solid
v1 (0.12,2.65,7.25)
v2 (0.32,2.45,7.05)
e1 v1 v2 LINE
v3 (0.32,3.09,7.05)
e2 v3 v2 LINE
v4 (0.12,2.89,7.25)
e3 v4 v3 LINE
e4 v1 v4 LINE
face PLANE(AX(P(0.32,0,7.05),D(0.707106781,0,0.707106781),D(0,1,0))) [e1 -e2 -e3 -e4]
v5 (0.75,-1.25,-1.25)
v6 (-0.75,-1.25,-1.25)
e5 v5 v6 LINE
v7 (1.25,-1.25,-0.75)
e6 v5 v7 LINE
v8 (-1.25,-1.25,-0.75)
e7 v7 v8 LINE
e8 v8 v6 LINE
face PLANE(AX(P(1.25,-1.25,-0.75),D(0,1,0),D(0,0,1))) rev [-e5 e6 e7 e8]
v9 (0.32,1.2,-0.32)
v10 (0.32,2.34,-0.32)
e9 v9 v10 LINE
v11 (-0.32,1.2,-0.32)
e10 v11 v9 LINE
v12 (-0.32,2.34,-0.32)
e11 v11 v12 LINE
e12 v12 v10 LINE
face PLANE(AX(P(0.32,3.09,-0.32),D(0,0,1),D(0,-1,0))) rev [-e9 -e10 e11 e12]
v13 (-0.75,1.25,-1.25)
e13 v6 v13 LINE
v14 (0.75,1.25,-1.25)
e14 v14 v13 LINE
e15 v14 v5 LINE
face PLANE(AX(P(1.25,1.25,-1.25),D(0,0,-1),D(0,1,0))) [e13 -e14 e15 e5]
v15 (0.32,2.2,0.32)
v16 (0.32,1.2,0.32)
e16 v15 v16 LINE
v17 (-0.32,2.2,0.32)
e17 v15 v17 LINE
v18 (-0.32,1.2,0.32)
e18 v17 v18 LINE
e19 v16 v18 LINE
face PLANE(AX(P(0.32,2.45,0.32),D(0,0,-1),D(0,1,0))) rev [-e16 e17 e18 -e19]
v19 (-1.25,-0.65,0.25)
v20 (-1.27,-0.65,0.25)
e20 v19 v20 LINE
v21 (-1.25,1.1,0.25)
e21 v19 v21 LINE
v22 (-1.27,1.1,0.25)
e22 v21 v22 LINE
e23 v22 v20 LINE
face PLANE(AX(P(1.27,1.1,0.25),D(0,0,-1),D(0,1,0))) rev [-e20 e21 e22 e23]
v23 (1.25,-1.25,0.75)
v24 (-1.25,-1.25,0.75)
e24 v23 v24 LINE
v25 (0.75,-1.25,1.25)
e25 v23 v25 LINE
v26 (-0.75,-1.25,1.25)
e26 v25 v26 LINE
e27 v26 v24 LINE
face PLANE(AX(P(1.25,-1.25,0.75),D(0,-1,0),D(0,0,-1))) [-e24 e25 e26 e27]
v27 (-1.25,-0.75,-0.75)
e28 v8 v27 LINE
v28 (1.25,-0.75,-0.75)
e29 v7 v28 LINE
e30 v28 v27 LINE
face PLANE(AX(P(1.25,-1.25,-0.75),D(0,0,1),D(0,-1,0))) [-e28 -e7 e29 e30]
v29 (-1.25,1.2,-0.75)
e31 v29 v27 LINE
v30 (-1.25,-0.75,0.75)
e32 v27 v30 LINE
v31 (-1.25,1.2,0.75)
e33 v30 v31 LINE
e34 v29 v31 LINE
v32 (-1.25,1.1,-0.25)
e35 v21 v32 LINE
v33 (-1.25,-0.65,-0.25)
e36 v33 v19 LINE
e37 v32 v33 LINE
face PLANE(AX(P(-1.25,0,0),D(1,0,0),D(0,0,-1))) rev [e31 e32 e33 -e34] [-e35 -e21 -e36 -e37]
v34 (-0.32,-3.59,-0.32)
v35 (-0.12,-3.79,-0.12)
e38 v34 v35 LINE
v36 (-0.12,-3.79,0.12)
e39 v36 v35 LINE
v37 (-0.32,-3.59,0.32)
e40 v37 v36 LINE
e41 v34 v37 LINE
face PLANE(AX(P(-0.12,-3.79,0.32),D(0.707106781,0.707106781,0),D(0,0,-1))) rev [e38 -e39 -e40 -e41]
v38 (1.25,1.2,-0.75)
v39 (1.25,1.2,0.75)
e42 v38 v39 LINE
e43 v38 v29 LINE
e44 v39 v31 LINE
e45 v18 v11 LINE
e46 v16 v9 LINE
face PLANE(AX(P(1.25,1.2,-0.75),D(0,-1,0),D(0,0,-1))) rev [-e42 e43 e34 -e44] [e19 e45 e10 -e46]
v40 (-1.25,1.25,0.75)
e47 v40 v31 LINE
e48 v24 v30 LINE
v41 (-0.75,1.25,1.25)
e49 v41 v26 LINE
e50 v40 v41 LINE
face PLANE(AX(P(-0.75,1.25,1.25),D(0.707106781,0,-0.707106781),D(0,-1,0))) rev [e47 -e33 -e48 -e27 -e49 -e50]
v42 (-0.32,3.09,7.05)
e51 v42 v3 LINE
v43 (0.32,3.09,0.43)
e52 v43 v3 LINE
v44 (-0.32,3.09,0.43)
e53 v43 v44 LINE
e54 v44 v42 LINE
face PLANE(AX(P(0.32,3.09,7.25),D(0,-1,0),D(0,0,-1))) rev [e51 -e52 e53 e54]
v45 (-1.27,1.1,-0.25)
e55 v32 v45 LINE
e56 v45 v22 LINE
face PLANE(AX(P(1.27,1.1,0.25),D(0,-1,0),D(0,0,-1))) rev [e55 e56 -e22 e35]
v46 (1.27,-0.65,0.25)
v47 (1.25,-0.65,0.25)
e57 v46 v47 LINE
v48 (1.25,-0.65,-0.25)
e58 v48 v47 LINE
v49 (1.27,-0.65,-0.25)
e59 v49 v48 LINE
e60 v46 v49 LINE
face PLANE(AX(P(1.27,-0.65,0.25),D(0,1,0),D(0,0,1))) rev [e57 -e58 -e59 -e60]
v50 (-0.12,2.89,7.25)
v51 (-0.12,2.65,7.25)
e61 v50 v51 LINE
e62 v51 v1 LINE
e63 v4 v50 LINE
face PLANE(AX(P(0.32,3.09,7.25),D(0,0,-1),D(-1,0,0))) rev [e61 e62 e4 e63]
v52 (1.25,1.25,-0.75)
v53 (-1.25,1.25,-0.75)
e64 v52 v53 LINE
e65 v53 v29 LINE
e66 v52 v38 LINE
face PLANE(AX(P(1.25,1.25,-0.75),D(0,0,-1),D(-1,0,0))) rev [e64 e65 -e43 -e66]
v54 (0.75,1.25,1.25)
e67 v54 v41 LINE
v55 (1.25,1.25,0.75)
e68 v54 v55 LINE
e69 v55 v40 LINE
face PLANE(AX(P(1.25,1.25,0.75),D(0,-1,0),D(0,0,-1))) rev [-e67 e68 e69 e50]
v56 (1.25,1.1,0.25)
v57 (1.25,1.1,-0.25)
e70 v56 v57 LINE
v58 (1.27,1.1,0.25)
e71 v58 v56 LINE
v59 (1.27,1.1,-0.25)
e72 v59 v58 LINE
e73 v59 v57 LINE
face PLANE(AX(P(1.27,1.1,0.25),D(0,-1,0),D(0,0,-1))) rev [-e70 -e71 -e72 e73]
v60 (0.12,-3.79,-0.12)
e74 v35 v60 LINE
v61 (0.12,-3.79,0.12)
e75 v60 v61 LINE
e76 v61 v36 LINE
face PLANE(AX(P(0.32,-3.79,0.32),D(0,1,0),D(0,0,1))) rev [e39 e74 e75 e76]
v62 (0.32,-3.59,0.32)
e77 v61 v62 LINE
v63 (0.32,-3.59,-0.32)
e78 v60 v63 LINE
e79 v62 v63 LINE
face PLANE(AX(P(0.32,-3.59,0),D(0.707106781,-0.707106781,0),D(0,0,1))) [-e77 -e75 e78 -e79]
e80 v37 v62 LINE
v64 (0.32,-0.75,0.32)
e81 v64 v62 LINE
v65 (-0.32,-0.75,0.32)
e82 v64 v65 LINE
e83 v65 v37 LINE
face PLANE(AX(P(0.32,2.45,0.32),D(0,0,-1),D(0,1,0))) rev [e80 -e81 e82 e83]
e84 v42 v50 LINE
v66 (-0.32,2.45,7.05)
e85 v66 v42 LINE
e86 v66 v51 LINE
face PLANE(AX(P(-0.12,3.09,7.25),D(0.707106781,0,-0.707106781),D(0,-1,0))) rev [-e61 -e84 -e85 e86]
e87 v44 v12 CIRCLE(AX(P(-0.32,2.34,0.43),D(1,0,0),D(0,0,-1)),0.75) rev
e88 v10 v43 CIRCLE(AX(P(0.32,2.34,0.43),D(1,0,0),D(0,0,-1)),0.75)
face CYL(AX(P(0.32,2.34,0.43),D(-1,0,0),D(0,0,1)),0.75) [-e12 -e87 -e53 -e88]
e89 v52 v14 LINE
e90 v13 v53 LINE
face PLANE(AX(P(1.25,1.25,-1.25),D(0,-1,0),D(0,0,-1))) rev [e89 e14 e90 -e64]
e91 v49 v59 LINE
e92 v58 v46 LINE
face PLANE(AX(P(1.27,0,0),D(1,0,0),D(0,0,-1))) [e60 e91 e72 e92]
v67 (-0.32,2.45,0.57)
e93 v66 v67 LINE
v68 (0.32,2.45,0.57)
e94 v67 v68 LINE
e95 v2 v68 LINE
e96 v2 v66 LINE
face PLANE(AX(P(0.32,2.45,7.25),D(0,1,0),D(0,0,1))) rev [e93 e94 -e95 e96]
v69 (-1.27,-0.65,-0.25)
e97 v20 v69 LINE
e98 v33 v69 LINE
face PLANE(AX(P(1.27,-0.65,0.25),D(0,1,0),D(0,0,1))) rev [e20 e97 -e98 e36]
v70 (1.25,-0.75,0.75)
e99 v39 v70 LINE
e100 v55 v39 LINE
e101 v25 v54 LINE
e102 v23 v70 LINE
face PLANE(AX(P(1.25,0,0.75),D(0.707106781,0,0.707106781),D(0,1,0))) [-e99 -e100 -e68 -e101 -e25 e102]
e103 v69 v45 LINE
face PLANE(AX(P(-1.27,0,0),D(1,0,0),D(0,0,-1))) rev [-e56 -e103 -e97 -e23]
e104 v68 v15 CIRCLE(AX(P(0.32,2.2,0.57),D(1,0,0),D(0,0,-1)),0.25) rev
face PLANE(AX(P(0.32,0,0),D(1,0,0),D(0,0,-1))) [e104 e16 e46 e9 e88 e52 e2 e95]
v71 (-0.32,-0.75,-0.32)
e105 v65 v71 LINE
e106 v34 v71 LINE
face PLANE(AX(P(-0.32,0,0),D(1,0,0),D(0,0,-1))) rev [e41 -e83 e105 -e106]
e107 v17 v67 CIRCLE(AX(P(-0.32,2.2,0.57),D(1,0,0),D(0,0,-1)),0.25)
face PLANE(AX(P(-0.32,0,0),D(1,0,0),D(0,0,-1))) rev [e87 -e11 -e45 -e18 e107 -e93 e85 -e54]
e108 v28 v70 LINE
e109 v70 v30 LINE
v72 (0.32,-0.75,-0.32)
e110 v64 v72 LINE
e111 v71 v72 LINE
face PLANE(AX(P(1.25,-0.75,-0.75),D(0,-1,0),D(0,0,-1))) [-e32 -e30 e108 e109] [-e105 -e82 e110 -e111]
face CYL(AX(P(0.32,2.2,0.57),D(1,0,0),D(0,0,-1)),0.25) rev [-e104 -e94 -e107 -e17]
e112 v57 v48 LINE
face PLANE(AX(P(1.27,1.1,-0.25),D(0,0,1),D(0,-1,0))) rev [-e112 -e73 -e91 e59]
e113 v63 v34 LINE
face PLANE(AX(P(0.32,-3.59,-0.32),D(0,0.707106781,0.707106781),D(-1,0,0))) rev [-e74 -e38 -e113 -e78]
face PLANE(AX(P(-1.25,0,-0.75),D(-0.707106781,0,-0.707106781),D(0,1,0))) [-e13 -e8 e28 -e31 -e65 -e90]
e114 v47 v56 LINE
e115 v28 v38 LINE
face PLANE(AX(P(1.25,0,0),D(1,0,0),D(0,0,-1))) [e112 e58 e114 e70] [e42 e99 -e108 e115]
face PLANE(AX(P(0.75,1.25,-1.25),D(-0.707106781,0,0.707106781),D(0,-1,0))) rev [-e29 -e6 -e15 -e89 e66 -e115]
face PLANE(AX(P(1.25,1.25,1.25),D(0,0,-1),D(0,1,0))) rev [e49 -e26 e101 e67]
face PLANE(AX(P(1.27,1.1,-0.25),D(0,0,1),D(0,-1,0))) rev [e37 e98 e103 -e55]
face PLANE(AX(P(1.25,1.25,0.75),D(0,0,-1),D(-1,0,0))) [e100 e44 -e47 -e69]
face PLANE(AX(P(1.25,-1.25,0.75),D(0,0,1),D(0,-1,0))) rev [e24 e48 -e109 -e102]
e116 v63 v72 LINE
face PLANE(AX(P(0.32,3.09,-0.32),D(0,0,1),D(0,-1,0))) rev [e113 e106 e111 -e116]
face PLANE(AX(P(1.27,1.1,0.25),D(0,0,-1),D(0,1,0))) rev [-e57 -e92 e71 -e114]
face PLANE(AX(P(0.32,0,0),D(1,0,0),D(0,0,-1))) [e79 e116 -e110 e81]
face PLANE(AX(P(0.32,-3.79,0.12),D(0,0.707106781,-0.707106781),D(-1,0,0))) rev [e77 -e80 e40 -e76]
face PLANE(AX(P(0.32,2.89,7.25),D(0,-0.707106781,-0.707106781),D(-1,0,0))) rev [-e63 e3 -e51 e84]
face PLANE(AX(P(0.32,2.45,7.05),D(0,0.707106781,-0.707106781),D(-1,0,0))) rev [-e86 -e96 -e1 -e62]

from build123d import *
from OCP.BRepFilletAPI import BRepFilletAPI_MakeFillet

# Parameters (mm, degrees)
BOSS_EXTRUDE1_DEPTH = 0.32
FILLET1_R1          = 0.75
FILLET1_R2          = 0.25
BOSS_EXTRUDE3_DEPTH = 1.25
CHAMFER1_SIZE       = 0.5
SKETCH3_W           = 0.5
SKETCH3_H           = 1.75
BOSS_EXTRUDE4_DEPTH = 1.27
CHAMFER2_SIZE       = 0.2


with BuildPart() as part:
    # Sketch1 → Boss-Extrude1 (new, symmetric)
    with BuildSketch(Plane(origin=(0, 0, 0), x_dir=(0, 0, -1), z_dir=(1, 0, 0))):
        Polygon((-7.25, 2.45), (-0.32, 2.45), (-0.32, -3.79), (0.32, -3.79), (0.32, 3.09), (-7.25, 3.09), align=None)
    extrude(amount=BOSS_EXTRUDE1_DEPTH, both=True)

    # Fillet1: one fillet with a radius per group of edges: ONE call of the kernel's fillet builder (fillet() takes one radius for all edges)
    fillet1_edges_1 = [part.edges().sort_by_distance(p)[0] for p in [
        (0, 3.09, -0.32),
    ]]
    fillet1_edges_2 = [part.edges().sort_by_distance(p)[0] for p in [
        (0, 2.45, 0.32),
    ]]
    fillet1 = BRepFilletAPI_MakeFillet(part.part.solid().wrapped)
    for e in fillet1_edges_1:
        fillet1.Add(FILLET1_R1, e.wrapped)
    for e in fillet1_edges_2:
        fillet1.Add(FILLET1_R2, e.wrapped)
    add(Compound.cast(fillet1.Shape()), mode=Mode.REPLACE)

    # Sketch2 → Boss-Extrude3 (add, symmetric)
    with BuildSketch(Plane(origin=(0, 0, 0), x_dir=(0, -1, 0), z_dir=(1, 0, 0))):
        Polygon((-1.25, 1.25), (1.25, 1.25), (1.25, 0.75), (0.75, 0.75), (0.75, -0.75), (1.25, -0.75), (1.25, -1.25), (-1.25, -1.25), (-1.25, -0.75), (-1.2, -0.75), (-1.2, 0.75), (-1.25, 0.75), align=None)
    extrude(amount=BOSS_EXTRUDE3_DEPTH, both=True)

    # Chamfer1
    chamfer1_edges = [part.edges().sort_by_distance(p)[0] for p in [
        (1.25, 0, 1.25),
        (1.25, 0, -1.25),
        (-1.25, 0, 1.25),
        (-1.25, 0, -1.25),
    ]]
    chamfer(chamfer1_edges, length=CHAMFER1_SIZE - 0.0001)  # a hair under: the kernel refuses the full size

    # Sketch3 → Boss-Extrude4 (add, symmetric)
    with BuildSketch(Plane(origin=(0, 0, 0), x_dir=(0, 0, -1), z_dir=(1, 0, 0))):
        with Locations((0, 0.225)):
            Rectangle(SKETCH3_W, SKETCH3_H)
    extrude(amount=BOSS_EXTRUDE4_DEPTH, both=True)

    # Chamfer2
    chamfer2_edges = [part.edges().sort_by_distance(p)[0] for p in [
        (0, 3.09, 7.25),
        (0, -3.79, -0.32),
        (0, -3.79, 0.32),
        (0, 2.45, 7.25),
        (0.32, -3.79, 0),
        (0.32, 2.77, 7.25),
        (-0.32, -3.79, 0),
        (-0.32, 2.77, 7.25),
    ]]
    chamfer(chamfer2_edges, length=CHAMFER2_SIZE)


solid = part.part
